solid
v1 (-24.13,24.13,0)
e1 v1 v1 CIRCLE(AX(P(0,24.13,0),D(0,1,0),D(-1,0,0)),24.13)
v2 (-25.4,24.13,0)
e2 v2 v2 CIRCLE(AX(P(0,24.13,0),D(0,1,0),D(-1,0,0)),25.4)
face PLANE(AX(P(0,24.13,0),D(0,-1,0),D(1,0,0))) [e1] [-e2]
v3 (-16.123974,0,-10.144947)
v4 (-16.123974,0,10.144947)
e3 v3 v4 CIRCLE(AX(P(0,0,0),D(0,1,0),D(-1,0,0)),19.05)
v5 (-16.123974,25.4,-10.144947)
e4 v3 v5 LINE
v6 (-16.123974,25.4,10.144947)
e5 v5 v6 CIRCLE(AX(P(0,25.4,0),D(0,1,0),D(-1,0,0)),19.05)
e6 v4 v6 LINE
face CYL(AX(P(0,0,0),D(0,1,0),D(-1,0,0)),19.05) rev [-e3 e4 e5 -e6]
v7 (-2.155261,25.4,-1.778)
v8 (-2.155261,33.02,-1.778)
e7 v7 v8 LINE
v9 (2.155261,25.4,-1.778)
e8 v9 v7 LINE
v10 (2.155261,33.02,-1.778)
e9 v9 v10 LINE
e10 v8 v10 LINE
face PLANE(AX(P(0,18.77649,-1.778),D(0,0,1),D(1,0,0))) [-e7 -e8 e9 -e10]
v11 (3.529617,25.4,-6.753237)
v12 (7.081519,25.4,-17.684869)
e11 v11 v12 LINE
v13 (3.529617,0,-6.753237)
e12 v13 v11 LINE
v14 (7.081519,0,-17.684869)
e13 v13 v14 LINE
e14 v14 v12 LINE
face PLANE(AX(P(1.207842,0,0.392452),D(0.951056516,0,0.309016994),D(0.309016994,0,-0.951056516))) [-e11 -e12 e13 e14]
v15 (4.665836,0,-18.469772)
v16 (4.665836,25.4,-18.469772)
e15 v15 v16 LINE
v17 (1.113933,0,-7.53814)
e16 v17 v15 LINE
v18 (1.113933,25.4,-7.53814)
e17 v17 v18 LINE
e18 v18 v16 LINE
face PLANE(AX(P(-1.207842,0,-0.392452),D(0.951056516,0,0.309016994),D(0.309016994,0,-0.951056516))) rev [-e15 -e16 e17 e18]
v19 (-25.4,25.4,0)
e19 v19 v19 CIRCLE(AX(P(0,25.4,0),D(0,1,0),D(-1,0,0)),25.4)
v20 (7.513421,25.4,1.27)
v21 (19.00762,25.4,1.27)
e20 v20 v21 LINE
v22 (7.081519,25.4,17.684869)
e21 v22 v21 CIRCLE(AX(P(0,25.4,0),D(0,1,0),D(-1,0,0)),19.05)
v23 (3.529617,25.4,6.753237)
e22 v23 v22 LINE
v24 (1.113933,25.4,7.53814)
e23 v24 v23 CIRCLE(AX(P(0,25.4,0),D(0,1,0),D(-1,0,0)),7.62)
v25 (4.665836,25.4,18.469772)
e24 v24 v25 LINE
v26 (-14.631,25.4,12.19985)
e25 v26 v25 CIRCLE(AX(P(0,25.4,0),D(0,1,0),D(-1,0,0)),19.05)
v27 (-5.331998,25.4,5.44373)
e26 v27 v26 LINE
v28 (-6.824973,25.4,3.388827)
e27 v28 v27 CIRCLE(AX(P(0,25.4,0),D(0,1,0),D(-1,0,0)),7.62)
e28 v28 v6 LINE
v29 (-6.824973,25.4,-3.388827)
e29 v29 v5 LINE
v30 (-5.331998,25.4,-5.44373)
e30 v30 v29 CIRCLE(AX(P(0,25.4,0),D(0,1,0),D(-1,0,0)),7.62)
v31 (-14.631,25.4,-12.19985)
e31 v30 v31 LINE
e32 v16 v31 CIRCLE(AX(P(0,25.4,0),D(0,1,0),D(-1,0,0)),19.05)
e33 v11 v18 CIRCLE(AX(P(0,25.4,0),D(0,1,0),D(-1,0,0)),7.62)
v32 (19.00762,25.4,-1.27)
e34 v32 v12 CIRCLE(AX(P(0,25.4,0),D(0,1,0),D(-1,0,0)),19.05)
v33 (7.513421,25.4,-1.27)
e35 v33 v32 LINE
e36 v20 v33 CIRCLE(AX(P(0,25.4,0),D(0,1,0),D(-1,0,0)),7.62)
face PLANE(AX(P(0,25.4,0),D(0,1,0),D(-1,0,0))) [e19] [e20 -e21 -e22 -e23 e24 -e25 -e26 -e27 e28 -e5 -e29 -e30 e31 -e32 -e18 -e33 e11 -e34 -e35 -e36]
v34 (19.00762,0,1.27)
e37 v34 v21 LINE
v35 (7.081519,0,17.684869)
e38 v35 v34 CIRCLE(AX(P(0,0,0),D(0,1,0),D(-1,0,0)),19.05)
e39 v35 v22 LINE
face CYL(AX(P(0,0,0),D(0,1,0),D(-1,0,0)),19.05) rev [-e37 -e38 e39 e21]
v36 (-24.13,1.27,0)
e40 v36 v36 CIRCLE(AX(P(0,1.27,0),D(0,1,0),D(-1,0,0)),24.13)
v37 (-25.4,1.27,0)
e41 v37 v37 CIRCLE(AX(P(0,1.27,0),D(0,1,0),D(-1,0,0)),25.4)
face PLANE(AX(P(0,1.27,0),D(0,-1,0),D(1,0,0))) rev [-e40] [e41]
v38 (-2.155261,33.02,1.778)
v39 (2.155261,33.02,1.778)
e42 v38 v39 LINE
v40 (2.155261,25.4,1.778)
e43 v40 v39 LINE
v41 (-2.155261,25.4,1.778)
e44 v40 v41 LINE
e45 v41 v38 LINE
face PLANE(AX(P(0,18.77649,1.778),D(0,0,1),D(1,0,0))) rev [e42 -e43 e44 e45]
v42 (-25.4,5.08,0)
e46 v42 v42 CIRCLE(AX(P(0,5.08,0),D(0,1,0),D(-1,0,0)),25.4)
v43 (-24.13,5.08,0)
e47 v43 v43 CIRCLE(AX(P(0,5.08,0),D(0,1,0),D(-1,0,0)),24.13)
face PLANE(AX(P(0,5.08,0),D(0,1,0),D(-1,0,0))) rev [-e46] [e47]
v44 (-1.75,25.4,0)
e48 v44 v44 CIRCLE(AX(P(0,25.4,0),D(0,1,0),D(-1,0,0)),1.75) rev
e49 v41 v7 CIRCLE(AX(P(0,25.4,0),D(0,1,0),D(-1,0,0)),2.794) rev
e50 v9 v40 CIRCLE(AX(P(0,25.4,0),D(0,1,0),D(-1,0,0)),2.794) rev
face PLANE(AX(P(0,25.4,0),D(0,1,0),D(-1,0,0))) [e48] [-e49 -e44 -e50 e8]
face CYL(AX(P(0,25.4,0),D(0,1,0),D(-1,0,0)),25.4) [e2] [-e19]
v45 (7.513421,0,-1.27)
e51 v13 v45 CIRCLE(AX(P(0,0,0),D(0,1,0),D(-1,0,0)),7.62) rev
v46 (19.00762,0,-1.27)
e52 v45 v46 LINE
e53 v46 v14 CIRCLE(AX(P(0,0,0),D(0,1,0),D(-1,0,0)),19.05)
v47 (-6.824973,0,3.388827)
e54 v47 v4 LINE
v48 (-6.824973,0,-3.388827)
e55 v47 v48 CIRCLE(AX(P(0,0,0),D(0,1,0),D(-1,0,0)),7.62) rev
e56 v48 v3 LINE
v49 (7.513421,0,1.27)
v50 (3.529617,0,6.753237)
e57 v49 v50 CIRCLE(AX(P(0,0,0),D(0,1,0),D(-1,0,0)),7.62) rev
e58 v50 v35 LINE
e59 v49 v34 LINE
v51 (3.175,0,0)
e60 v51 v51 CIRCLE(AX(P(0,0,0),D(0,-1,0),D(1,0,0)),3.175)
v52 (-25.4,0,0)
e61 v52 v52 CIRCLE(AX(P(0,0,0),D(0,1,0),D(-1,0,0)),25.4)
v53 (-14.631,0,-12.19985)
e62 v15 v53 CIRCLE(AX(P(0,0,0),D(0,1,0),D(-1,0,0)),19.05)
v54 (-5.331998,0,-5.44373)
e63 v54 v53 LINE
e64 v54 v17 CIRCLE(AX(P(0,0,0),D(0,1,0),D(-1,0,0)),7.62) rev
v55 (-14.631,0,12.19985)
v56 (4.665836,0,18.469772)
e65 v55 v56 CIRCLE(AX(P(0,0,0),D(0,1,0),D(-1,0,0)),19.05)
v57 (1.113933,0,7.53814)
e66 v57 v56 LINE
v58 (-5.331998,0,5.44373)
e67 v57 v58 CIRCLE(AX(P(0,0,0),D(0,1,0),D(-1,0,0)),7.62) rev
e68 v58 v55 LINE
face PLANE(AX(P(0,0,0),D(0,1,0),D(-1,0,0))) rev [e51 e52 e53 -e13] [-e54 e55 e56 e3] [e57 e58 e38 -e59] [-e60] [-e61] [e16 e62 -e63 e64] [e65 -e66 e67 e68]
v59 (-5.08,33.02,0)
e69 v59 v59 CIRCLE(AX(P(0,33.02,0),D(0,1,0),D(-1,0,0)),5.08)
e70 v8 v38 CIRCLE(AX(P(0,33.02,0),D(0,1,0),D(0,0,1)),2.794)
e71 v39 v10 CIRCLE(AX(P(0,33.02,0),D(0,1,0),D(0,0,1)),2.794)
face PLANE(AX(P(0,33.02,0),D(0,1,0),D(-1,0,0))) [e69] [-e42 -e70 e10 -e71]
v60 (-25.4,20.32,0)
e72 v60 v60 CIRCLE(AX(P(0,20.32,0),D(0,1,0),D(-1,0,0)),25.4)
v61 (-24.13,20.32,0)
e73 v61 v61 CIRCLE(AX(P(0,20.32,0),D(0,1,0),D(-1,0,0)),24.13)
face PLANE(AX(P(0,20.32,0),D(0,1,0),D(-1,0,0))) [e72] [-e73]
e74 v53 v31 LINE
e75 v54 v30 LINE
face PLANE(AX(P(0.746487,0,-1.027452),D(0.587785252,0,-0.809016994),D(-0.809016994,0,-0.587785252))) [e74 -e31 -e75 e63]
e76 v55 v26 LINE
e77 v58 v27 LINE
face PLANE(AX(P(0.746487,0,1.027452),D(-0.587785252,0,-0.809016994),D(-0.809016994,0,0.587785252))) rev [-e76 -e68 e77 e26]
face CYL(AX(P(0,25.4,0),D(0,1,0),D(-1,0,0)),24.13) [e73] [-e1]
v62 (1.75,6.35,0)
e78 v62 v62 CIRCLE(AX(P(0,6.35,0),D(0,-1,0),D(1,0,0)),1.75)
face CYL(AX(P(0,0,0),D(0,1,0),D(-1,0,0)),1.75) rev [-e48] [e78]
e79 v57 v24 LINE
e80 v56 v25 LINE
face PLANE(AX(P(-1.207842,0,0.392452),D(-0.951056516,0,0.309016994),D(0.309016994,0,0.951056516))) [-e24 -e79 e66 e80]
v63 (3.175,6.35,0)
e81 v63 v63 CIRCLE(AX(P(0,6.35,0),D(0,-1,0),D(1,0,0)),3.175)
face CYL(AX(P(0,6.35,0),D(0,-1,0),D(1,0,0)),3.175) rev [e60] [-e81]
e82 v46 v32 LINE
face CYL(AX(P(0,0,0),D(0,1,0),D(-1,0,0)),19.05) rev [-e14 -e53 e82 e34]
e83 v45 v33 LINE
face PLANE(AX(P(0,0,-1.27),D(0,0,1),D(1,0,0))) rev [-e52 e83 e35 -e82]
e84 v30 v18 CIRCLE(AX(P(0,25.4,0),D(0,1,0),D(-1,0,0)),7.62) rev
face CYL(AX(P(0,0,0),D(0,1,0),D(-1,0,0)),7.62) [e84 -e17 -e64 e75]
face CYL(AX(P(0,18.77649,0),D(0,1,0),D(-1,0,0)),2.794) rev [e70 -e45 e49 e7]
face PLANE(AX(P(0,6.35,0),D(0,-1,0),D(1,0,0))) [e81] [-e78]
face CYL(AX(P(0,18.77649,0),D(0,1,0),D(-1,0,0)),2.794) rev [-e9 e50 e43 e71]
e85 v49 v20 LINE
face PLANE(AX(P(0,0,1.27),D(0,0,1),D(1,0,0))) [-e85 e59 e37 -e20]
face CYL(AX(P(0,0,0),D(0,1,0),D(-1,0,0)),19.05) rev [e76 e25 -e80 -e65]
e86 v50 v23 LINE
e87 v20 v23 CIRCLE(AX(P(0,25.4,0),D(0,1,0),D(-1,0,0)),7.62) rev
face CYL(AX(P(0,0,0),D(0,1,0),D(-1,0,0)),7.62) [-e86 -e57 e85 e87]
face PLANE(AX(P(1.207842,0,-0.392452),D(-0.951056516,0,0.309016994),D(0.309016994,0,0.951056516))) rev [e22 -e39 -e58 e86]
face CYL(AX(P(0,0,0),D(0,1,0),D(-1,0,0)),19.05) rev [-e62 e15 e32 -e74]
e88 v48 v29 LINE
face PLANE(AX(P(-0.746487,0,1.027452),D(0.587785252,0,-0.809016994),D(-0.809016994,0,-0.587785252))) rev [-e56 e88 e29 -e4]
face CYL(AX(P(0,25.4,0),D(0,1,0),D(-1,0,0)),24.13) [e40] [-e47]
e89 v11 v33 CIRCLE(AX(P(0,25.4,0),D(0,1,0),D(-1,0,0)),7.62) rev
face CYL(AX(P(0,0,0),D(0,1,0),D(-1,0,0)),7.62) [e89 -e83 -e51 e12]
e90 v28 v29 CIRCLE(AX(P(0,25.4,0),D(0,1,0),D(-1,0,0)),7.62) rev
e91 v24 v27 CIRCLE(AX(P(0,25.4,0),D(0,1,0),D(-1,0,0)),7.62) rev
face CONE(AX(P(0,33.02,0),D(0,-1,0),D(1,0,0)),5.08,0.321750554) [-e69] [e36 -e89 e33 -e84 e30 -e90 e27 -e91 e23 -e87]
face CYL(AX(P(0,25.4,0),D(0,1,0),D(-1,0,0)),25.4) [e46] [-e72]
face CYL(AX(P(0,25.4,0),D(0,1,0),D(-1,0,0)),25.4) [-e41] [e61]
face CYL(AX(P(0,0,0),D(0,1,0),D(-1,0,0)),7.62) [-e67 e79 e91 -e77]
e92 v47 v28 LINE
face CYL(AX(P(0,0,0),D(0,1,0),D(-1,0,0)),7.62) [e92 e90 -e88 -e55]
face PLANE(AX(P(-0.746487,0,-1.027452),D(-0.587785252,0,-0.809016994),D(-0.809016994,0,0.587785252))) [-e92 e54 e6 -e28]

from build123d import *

# Parameters (mm, degrees)
SKETCH2_R              = 3.175
CUT_EXTRUDE1_DEPTH     = 6.35
CUT_EXTRUDE2_START     = 6.35
CUT_EXTRUDE2_OUTLINE_R = 1.75
CUT_EXTRUDE2_DEPTH     = 19.05
CUT_EXTRUDE3_DEPTH     = 7.62
CUT_EXTRUDE4_DEPTH     = 44.994090512


# Read off the part's stored shape, not the designer's step: Cut-Extrude2
with BuildPart() as part:
    # Sketch1 → Revolve1 (revolve)
    with BuildSketch(Plane.XY, mode=Mode.PRIVATE) as revolve1_sk:
        Polygon((0, 33.02), (0, 25.4), (7.62, 25.4), (5.08, 33.02), align=None)
        Polygon((0, 25.4), (0, 12.7), (25.4, 12.7), (25.4, 20.32), (24.13, 20.32), (24.13, 24.13), (25.4, 24.13), (25.4, 25.4), (7.62, 25.4), align=None)
        Polygon((0, 12.7), (0, 0), (25.4, 0), (25.4, 1.27), (24.13, 1.27), (24.13, 5.08), (25.4, 5.08), (25.4, 12.7), align=None)
    revolve(revolve1_sk.sketch.rotate(Axis((0, 25.4, 0), (0, -1, 0)), 180), axis=Axis((0, 25.4, 0), (0, -1, 0)))

    # Sketch2 → Cut-Extrude1 (cut)
    with BuildSketch(Plane(origin=(0, 0, 0), x_dir=(-1, 0, 0), z_dir=(0, -1, 0))):
        with Locations(Location((0, 0, 0), (0, 0, 180))):
            Circle(SKETCH2_R)
    extrude(amount=-CUT_EXTRUDE1_DEPTH, mode=Mode.SUBTRACT)

    # Cut-Extrude2 outline → Cut-Extrude2 (cut)
    with BuildSketch(Plane(origin=(0, 0, 0), x_dir=(1, 0, 0), z_dir=(0, 1, 0)).offset(CUT_EXTRUDE2_START)):
        Circle(CUT_EXTRUDE2_OUTLINE_R)
    extrude(amount=CUT_EXTRUDE2_DEPTH, mode=Mode.SUBTRACT)

    # Sketch3 → Cut-Extrude3 (cut)
    with BuildSketch(Plane(origin=(0, 33.02, 0), x_dir=(1, 0, 0), z_dir=(0, 1, 0))):
        with BuildLine():
            Line((2.155261469, 1.778), (-2.155261469, 1.778))
            ThreePointArc((-2.155261469, 1.778), (-2.794, 0), (-2.155261469, -1.778))
            Line((-2.155261469, -1.778), (2.155261469, -1.778))
            ThreePointArc((2.155261469, -1.778), (2.629471101, -0.944625708), (2.794, 0))
            ThreePointArc((2.794, 0), (2.629471101, 0.944625708), (2.155261469, 1.778))
        make_face()
    extrude(amount=-CUT_EXTRUDE3_DEPTH, mode=Mode.SUBTRACT)

    # Sketch4 → Cut-Extrude4 (cut, through all)
    with BuildSketch(Plane(origin=(0, 25.4, 0), x_dir=(1, 0, 0), z_dir=(0, 1, 0))):
        with BuildLine():
            ThreePointArc((-5.331998267, 5.443729832), (-2.354709497, 7.247050654), (1.113933099, 7.538139893))
            Line((1.113933099, 7.538139893), (4.66583568, 18.469771991))
            ThreePointArc((4.66583568, 18.469771991), (-5.886773743, 18.117626635), (-14.630999948, 12.199850021))
            Line((-14.630999948, 12.199850021), (-5.331998267, 5.443729832))
        make_face()
        with BuildLine():
            Line((-16.123974489, -10.144946855), (-6.824972808, -3.388826666))
            ThreePointArc((-6.824972808, -3.388826666), (-7.62, 0), (-6.824972808, 3.388826666))
            Line((-6.824972808, 3.388826666), (-16.123974489, 10.144946855))
            ThreePointArc((-16.123974489, 10.144946855), (-19.05, 0), (-16.123974489, -10.144946855))
        make_face()
        with BuildLine():
            Line((4.66583568, -18.469771991), (1.113933099, -7.538139893))
            ThreePointArc((1.113933099, -7.538139893), (-2.354709497, -7.247050654), (-5.331998267, -5.443729832))
            Line((-5.331998267, -5.443729832), (-14.630999948, -12.199850021))
            ThreePointArc((-14.630999948, -12.199850021), (-5.886773743, -18.117626635), (4.66583568, -18.469771991))
        make_face()
        with BuildLine():
            Line((19.007619525, -1.27), (7.513421325, -1.27))
            ThreePointArc((7.513421325, -1.27), (6.164709497, -4.478923622), (3.529616651, -6.753236728))
            Line((3.529616651, -6.753236728), (7.081519231, -17.684868825))
            ThreePointArc((7.081519231, -17.684868825), (15.411773743, -11.197309056), (19.007619525, -1.27))
        make_face()
        with BuildLine():
            ThreePointArc((3.529616651, 6.753236728), (6.164709497, 4.478923622), (7.513421325, 1.27))
            Line((7.513421325, 1.27), (19.007619525, 1.27))
            ThreePointArc((19.007619525, 1.27), (15.411773743, 11.197309056), (7.081519231, 17.684868825))
            Line((7.081519231, 17.684868825), (3.529616651, 6.753236728))
        make_face()
    extrude(amount=-CUT_EXTRUDE4_DEPTH, mode=Mode.SUBTRACT)


solid = part.part
